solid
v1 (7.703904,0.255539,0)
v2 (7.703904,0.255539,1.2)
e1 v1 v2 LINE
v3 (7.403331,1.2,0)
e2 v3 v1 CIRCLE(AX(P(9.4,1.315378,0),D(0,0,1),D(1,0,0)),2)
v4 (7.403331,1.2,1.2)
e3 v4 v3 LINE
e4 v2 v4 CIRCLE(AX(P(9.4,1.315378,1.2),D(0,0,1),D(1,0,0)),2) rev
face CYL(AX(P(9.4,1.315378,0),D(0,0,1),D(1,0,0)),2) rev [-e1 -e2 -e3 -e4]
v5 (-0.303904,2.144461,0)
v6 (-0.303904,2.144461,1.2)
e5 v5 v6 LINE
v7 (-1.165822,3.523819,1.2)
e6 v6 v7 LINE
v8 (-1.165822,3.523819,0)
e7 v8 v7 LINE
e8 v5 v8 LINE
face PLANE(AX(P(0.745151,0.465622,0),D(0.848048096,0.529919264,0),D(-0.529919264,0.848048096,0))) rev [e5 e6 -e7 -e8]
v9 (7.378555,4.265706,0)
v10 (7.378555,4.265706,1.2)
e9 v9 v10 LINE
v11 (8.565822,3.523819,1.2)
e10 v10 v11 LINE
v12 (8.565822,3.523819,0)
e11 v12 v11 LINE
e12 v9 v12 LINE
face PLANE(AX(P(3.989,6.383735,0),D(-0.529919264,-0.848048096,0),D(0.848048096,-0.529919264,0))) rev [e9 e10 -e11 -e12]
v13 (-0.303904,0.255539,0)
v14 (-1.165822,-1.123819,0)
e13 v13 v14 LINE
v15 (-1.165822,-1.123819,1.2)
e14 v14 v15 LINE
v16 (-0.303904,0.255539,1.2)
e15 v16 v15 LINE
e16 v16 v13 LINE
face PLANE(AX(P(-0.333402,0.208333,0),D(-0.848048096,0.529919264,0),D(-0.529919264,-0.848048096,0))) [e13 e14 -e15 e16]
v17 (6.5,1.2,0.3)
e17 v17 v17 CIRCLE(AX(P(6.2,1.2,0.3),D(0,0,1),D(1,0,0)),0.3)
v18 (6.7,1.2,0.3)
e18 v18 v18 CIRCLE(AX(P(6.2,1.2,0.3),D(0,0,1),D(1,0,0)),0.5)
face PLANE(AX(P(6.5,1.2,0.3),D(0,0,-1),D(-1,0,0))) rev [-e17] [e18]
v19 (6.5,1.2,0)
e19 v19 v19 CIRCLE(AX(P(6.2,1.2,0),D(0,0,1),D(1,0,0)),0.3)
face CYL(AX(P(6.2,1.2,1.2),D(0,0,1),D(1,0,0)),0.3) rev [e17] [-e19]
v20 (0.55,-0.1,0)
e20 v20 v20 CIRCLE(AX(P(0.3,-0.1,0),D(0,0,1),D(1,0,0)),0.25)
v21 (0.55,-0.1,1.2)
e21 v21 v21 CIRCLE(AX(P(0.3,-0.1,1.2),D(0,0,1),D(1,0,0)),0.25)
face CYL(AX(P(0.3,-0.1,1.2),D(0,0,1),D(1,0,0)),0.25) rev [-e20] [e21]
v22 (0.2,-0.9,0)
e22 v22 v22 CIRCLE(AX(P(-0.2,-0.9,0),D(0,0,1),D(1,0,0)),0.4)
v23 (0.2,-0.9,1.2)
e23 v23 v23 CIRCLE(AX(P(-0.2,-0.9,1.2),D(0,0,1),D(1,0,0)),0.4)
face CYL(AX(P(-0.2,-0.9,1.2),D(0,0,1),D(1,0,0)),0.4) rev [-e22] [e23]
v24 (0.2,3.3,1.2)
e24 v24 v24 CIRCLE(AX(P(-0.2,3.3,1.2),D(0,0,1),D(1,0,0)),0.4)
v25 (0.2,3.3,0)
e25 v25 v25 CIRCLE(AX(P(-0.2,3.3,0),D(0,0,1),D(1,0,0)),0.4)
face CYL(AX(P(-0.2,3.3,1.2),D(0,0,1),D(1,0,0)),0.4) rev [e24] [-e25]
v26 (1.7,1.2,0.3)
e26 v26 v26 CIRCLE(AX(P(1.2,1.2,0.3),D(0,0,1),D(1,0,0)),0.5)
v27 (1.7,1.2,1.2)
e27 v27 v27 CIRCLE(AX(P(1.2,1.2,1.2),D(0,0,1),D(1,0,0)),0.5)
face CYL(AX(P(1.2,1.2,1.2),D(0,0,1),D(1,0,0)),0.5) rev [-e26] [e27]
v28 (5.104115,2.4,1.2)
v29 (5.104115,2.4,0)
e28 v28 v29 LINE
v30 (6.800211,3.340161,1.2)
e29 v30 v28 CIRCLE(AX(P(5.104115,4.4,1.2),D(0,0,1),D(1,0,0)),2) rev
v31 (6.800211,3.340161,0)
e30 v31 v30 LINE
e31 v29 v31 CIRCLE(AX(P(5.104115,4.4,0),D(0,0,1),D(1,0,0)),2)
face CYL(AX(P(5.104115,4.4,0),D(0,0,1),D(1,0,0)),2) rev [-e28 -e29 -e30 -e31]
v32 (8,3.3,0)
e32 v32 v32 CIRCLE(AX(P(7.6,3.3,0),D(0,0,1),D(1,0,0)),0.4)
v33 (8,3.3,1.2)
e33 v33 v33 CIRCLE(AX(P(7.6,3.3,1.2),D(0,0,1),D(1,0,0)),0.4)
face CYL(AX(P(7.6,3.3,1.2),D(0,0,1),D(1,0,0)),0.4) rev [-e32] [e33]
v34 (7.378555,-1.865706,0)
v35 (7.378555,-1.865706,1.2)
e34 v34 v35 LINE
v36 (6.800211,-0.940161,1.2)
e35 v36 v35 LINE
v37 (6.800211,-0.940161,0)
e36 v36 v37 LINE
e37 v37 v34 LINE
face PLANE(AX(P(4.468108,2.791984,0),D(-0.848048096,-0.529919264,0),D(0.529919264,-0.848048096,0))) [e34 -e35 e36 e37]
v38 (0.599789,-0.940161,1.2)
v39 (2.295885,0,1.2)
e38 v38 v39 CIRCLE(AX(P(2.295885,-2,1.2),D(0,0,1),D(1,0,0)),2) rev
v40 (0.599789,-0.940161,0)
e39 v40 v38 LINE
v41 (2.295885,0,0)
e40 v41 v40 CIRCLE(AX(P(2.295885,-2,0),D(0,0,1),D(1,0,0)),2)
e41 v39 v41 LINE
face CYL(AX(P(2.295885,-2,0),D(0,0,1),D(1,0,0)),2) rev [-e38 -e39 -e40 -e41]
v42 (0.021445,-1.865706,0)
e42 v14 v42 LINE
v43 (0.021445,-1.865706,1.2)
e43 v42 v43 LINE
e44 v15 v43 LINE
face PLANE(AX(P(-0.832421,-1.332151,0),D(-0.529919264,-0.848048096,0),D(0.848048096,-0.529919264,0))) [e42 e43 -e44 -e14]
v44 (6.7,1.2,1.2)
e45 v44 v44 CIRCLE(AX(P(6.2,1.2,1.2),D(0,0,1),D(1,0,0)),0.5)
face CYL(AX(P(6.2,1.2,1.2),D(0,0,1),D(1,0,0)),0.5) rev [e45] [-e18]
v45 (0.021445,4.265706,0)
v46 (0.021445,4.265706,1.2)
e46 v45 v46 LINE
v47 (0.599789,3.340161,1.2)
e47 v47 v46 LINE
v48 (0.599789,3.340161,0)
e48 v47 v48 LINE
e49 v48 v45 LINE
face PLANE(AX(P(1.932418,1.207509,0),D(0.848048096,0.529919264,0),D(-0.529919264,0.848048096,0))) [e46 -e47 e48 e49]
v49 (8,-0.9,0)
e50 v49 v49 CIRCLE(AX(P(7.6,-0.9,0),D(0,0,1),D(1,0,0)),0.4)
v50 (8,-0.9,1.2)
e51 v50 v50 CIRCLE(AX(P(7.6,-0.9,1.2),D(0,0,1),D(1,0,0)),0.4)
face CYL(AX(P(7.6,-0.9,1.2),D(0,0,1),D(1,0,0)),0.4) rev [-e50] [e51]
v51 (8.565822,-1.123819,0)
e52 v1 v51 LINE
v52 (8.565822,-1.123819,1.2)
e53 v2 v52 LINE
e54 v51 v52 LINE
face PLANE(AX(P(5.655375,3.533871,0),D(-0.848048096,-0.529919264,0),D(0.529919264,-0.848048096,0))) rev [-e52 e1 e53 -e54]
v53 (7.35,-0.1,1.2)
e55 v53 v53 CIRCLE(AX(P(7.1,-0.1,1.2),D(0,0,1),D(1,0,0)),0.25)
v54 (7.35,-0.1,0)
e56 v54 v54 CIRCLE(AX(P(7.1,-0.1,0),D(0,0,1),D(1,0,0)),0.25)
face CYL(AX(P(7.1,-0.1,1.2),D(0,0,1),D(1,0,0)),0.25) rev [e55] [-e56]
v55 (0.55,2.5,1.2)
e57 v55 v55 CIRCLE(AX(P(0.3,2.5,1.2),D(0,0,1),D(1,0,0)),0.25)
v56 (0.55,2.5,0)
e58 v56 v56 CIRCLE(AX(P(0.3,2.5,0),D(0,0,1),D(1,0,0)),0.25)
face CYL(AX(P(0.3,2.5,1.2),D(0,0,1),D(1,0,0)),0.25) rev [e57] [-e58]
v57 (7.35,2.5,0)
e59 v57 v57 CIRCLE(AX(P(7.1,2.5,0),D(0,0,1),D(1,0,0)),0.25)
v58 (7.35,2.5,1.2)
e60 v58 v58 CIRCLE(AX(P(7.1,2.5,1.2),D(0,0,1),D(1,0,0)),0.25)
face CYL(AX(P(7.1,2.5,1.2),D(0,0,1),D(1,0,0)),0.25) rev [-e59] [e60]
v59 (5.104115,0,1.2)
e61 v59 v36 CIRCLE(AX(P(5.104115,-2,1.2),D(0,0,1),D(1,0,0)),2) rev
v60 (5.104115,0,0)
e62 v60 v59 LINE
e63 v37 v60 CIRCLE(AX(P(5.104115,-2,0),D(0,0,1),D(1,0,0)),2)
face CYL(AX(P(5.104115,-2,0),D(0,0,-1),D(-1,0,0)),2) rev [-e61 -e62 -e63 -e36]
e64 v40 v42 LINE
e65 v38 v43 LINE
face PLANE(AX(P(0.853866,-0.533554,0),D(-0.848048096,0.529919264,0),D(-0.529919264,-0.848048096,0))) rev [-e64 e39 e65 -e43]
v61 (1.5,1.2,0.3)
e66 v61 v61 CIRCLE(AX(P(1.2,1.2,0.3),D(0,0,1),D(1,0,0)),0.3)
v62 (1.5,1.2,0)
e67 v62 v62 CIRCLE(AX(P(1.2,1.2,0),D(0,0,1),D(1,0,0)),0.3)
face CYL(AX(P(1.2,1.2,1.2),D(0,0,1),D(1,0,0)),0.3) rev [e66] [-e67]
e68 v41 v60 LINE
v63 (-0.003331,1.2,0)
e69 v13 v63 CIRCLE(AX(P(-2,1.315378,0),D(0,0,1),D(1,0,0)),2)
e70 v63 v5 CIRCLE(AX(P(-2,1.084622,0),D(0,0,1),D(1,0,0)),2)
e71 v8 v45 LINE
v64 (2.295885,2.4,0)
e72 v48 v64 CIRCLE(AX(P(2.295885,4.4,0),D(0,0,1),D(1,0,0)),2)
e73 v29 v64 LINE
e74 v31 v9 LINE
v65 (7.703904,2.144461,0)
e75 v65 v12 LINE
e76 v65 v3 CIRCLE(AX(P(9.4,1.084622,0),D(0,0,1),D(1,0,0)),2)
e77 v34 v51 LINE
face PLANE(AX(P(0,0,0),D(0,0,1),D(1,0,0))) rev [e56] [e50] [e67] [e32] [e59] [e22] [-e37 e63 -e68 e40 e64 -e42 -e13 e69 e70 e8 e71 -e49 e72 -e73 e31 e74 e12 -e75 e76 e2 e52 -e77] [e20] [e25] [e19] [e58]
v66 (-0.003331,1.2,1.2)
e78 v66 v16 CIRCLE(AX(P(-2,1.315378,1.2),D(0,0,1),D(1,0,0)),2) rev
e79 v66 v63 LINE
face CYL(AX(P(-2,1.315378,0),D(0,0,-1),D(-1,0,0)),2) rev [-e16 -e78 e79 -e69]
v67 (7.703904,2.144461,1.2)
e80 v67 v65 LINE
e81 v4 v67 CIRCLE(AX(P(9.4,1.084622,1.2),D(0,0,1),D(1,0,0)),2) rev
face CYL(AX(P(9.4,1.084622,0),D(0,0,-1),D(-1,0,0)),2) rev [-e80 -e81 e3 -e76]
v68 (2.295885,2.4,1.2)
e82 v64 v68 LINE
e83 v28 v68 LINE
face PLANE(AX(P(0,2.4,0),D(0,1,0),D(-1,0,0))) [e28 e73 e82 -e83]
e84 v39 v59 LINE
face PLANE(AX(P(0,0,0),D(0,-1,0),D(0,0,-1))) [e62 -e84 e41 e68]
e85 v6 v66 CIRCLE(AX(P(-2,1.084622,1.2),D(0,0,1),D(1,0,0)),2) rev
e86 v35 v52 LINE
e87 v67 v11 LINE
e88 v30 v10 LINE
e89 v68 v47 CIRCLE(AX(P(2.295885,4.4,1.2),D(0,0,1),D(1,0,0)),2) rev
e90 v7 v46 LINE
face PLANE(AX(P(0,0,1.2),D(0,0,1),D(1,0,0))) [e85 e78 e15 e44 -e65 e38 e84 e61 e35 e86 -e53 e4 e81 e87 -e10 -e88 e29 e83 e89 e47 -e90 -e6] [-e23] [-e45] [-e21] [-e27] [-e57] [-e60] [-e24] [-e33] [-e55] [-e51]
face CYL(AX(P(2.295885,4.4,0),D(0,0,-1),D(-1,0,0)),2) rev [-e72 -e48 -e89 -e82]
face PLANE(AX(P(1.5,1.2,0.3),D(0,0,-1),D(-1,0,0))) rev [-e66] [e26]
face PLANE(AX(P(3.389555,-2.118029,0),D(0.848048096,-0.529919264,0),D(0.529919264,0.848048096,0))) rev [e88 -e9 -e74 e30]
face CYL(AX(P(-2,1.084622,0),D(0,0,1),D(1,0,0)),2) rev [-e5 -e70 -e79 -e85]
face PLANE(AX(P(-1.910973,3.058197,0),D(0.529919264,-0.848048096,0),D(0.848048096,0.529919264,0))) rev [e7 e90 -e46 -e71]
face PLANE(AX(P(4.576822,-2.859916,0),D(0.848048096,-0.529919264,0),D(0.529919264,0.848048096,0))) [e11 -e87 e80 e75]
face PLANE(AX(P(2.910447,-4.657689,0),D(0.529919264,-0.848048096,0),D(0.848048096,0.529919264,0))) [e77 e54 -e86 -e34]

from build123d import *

# Parameters (mm, degrees)
BOSS_EXTRUDE1_DEPTH        = 1.2
HOLE1_D                    = 0.6
HOLE1_CBORE_D              = 1
HOLE1_CBORE_DEPTH          = 0.9
FILLET1_R                  = 2
F_0_8_0_8_DIAMETER_HOLE1_D = 0.8
F_0_5_0_5_DIAMETER_HOLE1_D = 0.5


with BuildPart() as part:
    # Sketch1 → Boss-Extrude1 (new body)
    with BuildSketch(Plane.XY.offset(1.2)):
        Polygon((0.021444953, -1.865705812), (1.187267335, 0), (6.212732665, 0), (7.378555047, -1.865705812), (8.565822381, -1.123818842), (7.4, 0.74188697), (7.4, 1.65811303), (8.565822381, 3.523818842), (7.378555047, 4.265705812), (6.212732665, 2.4), (1.187267335, 2.4), (0.021444953, 4.265705812), (-1.165822381, 3.523818842), (0, 1.65811303), (0, 0.74188697), (-1.165822381, -1.123818842), align=None)
    extrude(amount=-BOSS_EXTRUDE1_DEPTH)

    # Hole1 (through all)
    with Locations(Plane.XY.offset(1.2)):
        with Locations((1.2, 1.2), (6.2, 1.2)):
            CounterBoreHole(HOLE1_D / 2, HOLE1_CBORE_D / 2, HOLE1_CBORE_DEPTH)

    # Fillet1
    # the kernel refuses this fillet: 2 mm, written as the material it adds along each edge
    with BuildSketch(Plane(origin=(6.212732665, 2.4, 1.2), x_dir=(-1, 0, 0), z_dir=(0, 0, -1)), Plane(origin=(1.187267335, 2.4, 1.2), x_dir=(-0.5299192642332093, 0.8480480961564231, 0), z_dir=(0, 0, -1))) as fillet1_piece_1:
        with BuildLine():
            CenterArc((FILLET1_R * 0.554309051453, FILLET1_R), FILLET1_R, 212, 58)
            Line((-FILLET1_R * 0.293739044704, FILLET1_R * 0.470080735767), (0, 0))
            Line((0, 0), (FILLET1_R * 0.554309051453, 0))
        make_face()
    extrude(amount=1.2)
    with BuildSketch(Plane(origin=(7.4, 1.65811303, 1.2), x_dir=(0, -1, 0), z_dir=(0, 0, -1)), Plane(origin=(7.4, 0.74188697, 1.2), x_dir=(0.5299192642332092, -0.8480480961564232, 0), z_dir=(0, 0, -1))) as fillet1_piece_2:
        with BuildLine():
            CenterArc((FILLET1_R * 0.286745385759, -FILLET1_R), FILLET1_R, 90, 32)
            Line((-FILLET1_R * 0.243173878474, -FILLET1_R * 0.151951903844), (0, 0))
            Line((0, 0), (FILLET1_R * 0.286745385759, 0))
        make_face()
    extrude(amount=1.2)
    with BuildSketch(Plane(origin=(6.212732665, 0, 1.2), x_dir=(-1, 0, 0), z_dir=(0, 0, -1)), Plane(origin=(1.187267335, 0, 1.2), x_dir=(-0.5299192642332091, -0.8480480961564235, 0), z_dir=(0, 0, -1))) as fillet1_piece_3:
        with BuildLine():
            CenterArc((FILLET1_R * 0.554309051453, -FILLET1_R), FILLET1_R, 90, 58)
            Line((-FILLET1_R * 0.293739044704, -FILLET1_R * 0.470080735767), (0, 0))
            Line((0, 0), (FILLET1_R * 0.554309051453, 0))
        make_face()
    extrude(amount=1.2)
    with BuildSketch(Plane(origin=(0, 0.74188697, 1.2), x_dir=(-0.5299192642332088, -0.8480480961564235, 0), z_dir=(0, 0, -1)), Plane(origin=(0, 1.65811303, 1.2), x_dir=(0, -1, 0), z_dir=(0, 0, -1))) as fillet1_piece_4:
        with BuildLine():
            CenterArc((FILLET1_R * 0.286745385759, FILLET1_R), FILLET1_R, 238, 32)
            Line((-FILLET1_R * 0.243173878474, FILLET1_R * 0.151951903844), (0, 0))
            Line((0, 0), (FILLET1_R * 0.286745385759, 0))
        make_face()
    extrude(amount=1.2)

    # Ø0.8 (0.8) Diameter Hole1 (through all)
    with Locations(Plane.XY.offset(1.2)):
        with Locations((-0.2, 3.3), (7.6, 3.3), (-0.2, -0.9), (7.6, -0.9)):
            Hole(F_0_8_0_8_DIAMETER_HOLE1_D / 2)

    # Ø0.5 (0.5) Diameter Hole1 (through all)
    with Locations(Plane.XY.offset(1.2)):
        with Locations((7.1, -0.1), (0.3, -0.1), (0.3, 2.5), (7.1, 2.5)):
            Hole(F_0_5_0_5_DIAMETER_HOLE1_D / 2)


solid = part.part
